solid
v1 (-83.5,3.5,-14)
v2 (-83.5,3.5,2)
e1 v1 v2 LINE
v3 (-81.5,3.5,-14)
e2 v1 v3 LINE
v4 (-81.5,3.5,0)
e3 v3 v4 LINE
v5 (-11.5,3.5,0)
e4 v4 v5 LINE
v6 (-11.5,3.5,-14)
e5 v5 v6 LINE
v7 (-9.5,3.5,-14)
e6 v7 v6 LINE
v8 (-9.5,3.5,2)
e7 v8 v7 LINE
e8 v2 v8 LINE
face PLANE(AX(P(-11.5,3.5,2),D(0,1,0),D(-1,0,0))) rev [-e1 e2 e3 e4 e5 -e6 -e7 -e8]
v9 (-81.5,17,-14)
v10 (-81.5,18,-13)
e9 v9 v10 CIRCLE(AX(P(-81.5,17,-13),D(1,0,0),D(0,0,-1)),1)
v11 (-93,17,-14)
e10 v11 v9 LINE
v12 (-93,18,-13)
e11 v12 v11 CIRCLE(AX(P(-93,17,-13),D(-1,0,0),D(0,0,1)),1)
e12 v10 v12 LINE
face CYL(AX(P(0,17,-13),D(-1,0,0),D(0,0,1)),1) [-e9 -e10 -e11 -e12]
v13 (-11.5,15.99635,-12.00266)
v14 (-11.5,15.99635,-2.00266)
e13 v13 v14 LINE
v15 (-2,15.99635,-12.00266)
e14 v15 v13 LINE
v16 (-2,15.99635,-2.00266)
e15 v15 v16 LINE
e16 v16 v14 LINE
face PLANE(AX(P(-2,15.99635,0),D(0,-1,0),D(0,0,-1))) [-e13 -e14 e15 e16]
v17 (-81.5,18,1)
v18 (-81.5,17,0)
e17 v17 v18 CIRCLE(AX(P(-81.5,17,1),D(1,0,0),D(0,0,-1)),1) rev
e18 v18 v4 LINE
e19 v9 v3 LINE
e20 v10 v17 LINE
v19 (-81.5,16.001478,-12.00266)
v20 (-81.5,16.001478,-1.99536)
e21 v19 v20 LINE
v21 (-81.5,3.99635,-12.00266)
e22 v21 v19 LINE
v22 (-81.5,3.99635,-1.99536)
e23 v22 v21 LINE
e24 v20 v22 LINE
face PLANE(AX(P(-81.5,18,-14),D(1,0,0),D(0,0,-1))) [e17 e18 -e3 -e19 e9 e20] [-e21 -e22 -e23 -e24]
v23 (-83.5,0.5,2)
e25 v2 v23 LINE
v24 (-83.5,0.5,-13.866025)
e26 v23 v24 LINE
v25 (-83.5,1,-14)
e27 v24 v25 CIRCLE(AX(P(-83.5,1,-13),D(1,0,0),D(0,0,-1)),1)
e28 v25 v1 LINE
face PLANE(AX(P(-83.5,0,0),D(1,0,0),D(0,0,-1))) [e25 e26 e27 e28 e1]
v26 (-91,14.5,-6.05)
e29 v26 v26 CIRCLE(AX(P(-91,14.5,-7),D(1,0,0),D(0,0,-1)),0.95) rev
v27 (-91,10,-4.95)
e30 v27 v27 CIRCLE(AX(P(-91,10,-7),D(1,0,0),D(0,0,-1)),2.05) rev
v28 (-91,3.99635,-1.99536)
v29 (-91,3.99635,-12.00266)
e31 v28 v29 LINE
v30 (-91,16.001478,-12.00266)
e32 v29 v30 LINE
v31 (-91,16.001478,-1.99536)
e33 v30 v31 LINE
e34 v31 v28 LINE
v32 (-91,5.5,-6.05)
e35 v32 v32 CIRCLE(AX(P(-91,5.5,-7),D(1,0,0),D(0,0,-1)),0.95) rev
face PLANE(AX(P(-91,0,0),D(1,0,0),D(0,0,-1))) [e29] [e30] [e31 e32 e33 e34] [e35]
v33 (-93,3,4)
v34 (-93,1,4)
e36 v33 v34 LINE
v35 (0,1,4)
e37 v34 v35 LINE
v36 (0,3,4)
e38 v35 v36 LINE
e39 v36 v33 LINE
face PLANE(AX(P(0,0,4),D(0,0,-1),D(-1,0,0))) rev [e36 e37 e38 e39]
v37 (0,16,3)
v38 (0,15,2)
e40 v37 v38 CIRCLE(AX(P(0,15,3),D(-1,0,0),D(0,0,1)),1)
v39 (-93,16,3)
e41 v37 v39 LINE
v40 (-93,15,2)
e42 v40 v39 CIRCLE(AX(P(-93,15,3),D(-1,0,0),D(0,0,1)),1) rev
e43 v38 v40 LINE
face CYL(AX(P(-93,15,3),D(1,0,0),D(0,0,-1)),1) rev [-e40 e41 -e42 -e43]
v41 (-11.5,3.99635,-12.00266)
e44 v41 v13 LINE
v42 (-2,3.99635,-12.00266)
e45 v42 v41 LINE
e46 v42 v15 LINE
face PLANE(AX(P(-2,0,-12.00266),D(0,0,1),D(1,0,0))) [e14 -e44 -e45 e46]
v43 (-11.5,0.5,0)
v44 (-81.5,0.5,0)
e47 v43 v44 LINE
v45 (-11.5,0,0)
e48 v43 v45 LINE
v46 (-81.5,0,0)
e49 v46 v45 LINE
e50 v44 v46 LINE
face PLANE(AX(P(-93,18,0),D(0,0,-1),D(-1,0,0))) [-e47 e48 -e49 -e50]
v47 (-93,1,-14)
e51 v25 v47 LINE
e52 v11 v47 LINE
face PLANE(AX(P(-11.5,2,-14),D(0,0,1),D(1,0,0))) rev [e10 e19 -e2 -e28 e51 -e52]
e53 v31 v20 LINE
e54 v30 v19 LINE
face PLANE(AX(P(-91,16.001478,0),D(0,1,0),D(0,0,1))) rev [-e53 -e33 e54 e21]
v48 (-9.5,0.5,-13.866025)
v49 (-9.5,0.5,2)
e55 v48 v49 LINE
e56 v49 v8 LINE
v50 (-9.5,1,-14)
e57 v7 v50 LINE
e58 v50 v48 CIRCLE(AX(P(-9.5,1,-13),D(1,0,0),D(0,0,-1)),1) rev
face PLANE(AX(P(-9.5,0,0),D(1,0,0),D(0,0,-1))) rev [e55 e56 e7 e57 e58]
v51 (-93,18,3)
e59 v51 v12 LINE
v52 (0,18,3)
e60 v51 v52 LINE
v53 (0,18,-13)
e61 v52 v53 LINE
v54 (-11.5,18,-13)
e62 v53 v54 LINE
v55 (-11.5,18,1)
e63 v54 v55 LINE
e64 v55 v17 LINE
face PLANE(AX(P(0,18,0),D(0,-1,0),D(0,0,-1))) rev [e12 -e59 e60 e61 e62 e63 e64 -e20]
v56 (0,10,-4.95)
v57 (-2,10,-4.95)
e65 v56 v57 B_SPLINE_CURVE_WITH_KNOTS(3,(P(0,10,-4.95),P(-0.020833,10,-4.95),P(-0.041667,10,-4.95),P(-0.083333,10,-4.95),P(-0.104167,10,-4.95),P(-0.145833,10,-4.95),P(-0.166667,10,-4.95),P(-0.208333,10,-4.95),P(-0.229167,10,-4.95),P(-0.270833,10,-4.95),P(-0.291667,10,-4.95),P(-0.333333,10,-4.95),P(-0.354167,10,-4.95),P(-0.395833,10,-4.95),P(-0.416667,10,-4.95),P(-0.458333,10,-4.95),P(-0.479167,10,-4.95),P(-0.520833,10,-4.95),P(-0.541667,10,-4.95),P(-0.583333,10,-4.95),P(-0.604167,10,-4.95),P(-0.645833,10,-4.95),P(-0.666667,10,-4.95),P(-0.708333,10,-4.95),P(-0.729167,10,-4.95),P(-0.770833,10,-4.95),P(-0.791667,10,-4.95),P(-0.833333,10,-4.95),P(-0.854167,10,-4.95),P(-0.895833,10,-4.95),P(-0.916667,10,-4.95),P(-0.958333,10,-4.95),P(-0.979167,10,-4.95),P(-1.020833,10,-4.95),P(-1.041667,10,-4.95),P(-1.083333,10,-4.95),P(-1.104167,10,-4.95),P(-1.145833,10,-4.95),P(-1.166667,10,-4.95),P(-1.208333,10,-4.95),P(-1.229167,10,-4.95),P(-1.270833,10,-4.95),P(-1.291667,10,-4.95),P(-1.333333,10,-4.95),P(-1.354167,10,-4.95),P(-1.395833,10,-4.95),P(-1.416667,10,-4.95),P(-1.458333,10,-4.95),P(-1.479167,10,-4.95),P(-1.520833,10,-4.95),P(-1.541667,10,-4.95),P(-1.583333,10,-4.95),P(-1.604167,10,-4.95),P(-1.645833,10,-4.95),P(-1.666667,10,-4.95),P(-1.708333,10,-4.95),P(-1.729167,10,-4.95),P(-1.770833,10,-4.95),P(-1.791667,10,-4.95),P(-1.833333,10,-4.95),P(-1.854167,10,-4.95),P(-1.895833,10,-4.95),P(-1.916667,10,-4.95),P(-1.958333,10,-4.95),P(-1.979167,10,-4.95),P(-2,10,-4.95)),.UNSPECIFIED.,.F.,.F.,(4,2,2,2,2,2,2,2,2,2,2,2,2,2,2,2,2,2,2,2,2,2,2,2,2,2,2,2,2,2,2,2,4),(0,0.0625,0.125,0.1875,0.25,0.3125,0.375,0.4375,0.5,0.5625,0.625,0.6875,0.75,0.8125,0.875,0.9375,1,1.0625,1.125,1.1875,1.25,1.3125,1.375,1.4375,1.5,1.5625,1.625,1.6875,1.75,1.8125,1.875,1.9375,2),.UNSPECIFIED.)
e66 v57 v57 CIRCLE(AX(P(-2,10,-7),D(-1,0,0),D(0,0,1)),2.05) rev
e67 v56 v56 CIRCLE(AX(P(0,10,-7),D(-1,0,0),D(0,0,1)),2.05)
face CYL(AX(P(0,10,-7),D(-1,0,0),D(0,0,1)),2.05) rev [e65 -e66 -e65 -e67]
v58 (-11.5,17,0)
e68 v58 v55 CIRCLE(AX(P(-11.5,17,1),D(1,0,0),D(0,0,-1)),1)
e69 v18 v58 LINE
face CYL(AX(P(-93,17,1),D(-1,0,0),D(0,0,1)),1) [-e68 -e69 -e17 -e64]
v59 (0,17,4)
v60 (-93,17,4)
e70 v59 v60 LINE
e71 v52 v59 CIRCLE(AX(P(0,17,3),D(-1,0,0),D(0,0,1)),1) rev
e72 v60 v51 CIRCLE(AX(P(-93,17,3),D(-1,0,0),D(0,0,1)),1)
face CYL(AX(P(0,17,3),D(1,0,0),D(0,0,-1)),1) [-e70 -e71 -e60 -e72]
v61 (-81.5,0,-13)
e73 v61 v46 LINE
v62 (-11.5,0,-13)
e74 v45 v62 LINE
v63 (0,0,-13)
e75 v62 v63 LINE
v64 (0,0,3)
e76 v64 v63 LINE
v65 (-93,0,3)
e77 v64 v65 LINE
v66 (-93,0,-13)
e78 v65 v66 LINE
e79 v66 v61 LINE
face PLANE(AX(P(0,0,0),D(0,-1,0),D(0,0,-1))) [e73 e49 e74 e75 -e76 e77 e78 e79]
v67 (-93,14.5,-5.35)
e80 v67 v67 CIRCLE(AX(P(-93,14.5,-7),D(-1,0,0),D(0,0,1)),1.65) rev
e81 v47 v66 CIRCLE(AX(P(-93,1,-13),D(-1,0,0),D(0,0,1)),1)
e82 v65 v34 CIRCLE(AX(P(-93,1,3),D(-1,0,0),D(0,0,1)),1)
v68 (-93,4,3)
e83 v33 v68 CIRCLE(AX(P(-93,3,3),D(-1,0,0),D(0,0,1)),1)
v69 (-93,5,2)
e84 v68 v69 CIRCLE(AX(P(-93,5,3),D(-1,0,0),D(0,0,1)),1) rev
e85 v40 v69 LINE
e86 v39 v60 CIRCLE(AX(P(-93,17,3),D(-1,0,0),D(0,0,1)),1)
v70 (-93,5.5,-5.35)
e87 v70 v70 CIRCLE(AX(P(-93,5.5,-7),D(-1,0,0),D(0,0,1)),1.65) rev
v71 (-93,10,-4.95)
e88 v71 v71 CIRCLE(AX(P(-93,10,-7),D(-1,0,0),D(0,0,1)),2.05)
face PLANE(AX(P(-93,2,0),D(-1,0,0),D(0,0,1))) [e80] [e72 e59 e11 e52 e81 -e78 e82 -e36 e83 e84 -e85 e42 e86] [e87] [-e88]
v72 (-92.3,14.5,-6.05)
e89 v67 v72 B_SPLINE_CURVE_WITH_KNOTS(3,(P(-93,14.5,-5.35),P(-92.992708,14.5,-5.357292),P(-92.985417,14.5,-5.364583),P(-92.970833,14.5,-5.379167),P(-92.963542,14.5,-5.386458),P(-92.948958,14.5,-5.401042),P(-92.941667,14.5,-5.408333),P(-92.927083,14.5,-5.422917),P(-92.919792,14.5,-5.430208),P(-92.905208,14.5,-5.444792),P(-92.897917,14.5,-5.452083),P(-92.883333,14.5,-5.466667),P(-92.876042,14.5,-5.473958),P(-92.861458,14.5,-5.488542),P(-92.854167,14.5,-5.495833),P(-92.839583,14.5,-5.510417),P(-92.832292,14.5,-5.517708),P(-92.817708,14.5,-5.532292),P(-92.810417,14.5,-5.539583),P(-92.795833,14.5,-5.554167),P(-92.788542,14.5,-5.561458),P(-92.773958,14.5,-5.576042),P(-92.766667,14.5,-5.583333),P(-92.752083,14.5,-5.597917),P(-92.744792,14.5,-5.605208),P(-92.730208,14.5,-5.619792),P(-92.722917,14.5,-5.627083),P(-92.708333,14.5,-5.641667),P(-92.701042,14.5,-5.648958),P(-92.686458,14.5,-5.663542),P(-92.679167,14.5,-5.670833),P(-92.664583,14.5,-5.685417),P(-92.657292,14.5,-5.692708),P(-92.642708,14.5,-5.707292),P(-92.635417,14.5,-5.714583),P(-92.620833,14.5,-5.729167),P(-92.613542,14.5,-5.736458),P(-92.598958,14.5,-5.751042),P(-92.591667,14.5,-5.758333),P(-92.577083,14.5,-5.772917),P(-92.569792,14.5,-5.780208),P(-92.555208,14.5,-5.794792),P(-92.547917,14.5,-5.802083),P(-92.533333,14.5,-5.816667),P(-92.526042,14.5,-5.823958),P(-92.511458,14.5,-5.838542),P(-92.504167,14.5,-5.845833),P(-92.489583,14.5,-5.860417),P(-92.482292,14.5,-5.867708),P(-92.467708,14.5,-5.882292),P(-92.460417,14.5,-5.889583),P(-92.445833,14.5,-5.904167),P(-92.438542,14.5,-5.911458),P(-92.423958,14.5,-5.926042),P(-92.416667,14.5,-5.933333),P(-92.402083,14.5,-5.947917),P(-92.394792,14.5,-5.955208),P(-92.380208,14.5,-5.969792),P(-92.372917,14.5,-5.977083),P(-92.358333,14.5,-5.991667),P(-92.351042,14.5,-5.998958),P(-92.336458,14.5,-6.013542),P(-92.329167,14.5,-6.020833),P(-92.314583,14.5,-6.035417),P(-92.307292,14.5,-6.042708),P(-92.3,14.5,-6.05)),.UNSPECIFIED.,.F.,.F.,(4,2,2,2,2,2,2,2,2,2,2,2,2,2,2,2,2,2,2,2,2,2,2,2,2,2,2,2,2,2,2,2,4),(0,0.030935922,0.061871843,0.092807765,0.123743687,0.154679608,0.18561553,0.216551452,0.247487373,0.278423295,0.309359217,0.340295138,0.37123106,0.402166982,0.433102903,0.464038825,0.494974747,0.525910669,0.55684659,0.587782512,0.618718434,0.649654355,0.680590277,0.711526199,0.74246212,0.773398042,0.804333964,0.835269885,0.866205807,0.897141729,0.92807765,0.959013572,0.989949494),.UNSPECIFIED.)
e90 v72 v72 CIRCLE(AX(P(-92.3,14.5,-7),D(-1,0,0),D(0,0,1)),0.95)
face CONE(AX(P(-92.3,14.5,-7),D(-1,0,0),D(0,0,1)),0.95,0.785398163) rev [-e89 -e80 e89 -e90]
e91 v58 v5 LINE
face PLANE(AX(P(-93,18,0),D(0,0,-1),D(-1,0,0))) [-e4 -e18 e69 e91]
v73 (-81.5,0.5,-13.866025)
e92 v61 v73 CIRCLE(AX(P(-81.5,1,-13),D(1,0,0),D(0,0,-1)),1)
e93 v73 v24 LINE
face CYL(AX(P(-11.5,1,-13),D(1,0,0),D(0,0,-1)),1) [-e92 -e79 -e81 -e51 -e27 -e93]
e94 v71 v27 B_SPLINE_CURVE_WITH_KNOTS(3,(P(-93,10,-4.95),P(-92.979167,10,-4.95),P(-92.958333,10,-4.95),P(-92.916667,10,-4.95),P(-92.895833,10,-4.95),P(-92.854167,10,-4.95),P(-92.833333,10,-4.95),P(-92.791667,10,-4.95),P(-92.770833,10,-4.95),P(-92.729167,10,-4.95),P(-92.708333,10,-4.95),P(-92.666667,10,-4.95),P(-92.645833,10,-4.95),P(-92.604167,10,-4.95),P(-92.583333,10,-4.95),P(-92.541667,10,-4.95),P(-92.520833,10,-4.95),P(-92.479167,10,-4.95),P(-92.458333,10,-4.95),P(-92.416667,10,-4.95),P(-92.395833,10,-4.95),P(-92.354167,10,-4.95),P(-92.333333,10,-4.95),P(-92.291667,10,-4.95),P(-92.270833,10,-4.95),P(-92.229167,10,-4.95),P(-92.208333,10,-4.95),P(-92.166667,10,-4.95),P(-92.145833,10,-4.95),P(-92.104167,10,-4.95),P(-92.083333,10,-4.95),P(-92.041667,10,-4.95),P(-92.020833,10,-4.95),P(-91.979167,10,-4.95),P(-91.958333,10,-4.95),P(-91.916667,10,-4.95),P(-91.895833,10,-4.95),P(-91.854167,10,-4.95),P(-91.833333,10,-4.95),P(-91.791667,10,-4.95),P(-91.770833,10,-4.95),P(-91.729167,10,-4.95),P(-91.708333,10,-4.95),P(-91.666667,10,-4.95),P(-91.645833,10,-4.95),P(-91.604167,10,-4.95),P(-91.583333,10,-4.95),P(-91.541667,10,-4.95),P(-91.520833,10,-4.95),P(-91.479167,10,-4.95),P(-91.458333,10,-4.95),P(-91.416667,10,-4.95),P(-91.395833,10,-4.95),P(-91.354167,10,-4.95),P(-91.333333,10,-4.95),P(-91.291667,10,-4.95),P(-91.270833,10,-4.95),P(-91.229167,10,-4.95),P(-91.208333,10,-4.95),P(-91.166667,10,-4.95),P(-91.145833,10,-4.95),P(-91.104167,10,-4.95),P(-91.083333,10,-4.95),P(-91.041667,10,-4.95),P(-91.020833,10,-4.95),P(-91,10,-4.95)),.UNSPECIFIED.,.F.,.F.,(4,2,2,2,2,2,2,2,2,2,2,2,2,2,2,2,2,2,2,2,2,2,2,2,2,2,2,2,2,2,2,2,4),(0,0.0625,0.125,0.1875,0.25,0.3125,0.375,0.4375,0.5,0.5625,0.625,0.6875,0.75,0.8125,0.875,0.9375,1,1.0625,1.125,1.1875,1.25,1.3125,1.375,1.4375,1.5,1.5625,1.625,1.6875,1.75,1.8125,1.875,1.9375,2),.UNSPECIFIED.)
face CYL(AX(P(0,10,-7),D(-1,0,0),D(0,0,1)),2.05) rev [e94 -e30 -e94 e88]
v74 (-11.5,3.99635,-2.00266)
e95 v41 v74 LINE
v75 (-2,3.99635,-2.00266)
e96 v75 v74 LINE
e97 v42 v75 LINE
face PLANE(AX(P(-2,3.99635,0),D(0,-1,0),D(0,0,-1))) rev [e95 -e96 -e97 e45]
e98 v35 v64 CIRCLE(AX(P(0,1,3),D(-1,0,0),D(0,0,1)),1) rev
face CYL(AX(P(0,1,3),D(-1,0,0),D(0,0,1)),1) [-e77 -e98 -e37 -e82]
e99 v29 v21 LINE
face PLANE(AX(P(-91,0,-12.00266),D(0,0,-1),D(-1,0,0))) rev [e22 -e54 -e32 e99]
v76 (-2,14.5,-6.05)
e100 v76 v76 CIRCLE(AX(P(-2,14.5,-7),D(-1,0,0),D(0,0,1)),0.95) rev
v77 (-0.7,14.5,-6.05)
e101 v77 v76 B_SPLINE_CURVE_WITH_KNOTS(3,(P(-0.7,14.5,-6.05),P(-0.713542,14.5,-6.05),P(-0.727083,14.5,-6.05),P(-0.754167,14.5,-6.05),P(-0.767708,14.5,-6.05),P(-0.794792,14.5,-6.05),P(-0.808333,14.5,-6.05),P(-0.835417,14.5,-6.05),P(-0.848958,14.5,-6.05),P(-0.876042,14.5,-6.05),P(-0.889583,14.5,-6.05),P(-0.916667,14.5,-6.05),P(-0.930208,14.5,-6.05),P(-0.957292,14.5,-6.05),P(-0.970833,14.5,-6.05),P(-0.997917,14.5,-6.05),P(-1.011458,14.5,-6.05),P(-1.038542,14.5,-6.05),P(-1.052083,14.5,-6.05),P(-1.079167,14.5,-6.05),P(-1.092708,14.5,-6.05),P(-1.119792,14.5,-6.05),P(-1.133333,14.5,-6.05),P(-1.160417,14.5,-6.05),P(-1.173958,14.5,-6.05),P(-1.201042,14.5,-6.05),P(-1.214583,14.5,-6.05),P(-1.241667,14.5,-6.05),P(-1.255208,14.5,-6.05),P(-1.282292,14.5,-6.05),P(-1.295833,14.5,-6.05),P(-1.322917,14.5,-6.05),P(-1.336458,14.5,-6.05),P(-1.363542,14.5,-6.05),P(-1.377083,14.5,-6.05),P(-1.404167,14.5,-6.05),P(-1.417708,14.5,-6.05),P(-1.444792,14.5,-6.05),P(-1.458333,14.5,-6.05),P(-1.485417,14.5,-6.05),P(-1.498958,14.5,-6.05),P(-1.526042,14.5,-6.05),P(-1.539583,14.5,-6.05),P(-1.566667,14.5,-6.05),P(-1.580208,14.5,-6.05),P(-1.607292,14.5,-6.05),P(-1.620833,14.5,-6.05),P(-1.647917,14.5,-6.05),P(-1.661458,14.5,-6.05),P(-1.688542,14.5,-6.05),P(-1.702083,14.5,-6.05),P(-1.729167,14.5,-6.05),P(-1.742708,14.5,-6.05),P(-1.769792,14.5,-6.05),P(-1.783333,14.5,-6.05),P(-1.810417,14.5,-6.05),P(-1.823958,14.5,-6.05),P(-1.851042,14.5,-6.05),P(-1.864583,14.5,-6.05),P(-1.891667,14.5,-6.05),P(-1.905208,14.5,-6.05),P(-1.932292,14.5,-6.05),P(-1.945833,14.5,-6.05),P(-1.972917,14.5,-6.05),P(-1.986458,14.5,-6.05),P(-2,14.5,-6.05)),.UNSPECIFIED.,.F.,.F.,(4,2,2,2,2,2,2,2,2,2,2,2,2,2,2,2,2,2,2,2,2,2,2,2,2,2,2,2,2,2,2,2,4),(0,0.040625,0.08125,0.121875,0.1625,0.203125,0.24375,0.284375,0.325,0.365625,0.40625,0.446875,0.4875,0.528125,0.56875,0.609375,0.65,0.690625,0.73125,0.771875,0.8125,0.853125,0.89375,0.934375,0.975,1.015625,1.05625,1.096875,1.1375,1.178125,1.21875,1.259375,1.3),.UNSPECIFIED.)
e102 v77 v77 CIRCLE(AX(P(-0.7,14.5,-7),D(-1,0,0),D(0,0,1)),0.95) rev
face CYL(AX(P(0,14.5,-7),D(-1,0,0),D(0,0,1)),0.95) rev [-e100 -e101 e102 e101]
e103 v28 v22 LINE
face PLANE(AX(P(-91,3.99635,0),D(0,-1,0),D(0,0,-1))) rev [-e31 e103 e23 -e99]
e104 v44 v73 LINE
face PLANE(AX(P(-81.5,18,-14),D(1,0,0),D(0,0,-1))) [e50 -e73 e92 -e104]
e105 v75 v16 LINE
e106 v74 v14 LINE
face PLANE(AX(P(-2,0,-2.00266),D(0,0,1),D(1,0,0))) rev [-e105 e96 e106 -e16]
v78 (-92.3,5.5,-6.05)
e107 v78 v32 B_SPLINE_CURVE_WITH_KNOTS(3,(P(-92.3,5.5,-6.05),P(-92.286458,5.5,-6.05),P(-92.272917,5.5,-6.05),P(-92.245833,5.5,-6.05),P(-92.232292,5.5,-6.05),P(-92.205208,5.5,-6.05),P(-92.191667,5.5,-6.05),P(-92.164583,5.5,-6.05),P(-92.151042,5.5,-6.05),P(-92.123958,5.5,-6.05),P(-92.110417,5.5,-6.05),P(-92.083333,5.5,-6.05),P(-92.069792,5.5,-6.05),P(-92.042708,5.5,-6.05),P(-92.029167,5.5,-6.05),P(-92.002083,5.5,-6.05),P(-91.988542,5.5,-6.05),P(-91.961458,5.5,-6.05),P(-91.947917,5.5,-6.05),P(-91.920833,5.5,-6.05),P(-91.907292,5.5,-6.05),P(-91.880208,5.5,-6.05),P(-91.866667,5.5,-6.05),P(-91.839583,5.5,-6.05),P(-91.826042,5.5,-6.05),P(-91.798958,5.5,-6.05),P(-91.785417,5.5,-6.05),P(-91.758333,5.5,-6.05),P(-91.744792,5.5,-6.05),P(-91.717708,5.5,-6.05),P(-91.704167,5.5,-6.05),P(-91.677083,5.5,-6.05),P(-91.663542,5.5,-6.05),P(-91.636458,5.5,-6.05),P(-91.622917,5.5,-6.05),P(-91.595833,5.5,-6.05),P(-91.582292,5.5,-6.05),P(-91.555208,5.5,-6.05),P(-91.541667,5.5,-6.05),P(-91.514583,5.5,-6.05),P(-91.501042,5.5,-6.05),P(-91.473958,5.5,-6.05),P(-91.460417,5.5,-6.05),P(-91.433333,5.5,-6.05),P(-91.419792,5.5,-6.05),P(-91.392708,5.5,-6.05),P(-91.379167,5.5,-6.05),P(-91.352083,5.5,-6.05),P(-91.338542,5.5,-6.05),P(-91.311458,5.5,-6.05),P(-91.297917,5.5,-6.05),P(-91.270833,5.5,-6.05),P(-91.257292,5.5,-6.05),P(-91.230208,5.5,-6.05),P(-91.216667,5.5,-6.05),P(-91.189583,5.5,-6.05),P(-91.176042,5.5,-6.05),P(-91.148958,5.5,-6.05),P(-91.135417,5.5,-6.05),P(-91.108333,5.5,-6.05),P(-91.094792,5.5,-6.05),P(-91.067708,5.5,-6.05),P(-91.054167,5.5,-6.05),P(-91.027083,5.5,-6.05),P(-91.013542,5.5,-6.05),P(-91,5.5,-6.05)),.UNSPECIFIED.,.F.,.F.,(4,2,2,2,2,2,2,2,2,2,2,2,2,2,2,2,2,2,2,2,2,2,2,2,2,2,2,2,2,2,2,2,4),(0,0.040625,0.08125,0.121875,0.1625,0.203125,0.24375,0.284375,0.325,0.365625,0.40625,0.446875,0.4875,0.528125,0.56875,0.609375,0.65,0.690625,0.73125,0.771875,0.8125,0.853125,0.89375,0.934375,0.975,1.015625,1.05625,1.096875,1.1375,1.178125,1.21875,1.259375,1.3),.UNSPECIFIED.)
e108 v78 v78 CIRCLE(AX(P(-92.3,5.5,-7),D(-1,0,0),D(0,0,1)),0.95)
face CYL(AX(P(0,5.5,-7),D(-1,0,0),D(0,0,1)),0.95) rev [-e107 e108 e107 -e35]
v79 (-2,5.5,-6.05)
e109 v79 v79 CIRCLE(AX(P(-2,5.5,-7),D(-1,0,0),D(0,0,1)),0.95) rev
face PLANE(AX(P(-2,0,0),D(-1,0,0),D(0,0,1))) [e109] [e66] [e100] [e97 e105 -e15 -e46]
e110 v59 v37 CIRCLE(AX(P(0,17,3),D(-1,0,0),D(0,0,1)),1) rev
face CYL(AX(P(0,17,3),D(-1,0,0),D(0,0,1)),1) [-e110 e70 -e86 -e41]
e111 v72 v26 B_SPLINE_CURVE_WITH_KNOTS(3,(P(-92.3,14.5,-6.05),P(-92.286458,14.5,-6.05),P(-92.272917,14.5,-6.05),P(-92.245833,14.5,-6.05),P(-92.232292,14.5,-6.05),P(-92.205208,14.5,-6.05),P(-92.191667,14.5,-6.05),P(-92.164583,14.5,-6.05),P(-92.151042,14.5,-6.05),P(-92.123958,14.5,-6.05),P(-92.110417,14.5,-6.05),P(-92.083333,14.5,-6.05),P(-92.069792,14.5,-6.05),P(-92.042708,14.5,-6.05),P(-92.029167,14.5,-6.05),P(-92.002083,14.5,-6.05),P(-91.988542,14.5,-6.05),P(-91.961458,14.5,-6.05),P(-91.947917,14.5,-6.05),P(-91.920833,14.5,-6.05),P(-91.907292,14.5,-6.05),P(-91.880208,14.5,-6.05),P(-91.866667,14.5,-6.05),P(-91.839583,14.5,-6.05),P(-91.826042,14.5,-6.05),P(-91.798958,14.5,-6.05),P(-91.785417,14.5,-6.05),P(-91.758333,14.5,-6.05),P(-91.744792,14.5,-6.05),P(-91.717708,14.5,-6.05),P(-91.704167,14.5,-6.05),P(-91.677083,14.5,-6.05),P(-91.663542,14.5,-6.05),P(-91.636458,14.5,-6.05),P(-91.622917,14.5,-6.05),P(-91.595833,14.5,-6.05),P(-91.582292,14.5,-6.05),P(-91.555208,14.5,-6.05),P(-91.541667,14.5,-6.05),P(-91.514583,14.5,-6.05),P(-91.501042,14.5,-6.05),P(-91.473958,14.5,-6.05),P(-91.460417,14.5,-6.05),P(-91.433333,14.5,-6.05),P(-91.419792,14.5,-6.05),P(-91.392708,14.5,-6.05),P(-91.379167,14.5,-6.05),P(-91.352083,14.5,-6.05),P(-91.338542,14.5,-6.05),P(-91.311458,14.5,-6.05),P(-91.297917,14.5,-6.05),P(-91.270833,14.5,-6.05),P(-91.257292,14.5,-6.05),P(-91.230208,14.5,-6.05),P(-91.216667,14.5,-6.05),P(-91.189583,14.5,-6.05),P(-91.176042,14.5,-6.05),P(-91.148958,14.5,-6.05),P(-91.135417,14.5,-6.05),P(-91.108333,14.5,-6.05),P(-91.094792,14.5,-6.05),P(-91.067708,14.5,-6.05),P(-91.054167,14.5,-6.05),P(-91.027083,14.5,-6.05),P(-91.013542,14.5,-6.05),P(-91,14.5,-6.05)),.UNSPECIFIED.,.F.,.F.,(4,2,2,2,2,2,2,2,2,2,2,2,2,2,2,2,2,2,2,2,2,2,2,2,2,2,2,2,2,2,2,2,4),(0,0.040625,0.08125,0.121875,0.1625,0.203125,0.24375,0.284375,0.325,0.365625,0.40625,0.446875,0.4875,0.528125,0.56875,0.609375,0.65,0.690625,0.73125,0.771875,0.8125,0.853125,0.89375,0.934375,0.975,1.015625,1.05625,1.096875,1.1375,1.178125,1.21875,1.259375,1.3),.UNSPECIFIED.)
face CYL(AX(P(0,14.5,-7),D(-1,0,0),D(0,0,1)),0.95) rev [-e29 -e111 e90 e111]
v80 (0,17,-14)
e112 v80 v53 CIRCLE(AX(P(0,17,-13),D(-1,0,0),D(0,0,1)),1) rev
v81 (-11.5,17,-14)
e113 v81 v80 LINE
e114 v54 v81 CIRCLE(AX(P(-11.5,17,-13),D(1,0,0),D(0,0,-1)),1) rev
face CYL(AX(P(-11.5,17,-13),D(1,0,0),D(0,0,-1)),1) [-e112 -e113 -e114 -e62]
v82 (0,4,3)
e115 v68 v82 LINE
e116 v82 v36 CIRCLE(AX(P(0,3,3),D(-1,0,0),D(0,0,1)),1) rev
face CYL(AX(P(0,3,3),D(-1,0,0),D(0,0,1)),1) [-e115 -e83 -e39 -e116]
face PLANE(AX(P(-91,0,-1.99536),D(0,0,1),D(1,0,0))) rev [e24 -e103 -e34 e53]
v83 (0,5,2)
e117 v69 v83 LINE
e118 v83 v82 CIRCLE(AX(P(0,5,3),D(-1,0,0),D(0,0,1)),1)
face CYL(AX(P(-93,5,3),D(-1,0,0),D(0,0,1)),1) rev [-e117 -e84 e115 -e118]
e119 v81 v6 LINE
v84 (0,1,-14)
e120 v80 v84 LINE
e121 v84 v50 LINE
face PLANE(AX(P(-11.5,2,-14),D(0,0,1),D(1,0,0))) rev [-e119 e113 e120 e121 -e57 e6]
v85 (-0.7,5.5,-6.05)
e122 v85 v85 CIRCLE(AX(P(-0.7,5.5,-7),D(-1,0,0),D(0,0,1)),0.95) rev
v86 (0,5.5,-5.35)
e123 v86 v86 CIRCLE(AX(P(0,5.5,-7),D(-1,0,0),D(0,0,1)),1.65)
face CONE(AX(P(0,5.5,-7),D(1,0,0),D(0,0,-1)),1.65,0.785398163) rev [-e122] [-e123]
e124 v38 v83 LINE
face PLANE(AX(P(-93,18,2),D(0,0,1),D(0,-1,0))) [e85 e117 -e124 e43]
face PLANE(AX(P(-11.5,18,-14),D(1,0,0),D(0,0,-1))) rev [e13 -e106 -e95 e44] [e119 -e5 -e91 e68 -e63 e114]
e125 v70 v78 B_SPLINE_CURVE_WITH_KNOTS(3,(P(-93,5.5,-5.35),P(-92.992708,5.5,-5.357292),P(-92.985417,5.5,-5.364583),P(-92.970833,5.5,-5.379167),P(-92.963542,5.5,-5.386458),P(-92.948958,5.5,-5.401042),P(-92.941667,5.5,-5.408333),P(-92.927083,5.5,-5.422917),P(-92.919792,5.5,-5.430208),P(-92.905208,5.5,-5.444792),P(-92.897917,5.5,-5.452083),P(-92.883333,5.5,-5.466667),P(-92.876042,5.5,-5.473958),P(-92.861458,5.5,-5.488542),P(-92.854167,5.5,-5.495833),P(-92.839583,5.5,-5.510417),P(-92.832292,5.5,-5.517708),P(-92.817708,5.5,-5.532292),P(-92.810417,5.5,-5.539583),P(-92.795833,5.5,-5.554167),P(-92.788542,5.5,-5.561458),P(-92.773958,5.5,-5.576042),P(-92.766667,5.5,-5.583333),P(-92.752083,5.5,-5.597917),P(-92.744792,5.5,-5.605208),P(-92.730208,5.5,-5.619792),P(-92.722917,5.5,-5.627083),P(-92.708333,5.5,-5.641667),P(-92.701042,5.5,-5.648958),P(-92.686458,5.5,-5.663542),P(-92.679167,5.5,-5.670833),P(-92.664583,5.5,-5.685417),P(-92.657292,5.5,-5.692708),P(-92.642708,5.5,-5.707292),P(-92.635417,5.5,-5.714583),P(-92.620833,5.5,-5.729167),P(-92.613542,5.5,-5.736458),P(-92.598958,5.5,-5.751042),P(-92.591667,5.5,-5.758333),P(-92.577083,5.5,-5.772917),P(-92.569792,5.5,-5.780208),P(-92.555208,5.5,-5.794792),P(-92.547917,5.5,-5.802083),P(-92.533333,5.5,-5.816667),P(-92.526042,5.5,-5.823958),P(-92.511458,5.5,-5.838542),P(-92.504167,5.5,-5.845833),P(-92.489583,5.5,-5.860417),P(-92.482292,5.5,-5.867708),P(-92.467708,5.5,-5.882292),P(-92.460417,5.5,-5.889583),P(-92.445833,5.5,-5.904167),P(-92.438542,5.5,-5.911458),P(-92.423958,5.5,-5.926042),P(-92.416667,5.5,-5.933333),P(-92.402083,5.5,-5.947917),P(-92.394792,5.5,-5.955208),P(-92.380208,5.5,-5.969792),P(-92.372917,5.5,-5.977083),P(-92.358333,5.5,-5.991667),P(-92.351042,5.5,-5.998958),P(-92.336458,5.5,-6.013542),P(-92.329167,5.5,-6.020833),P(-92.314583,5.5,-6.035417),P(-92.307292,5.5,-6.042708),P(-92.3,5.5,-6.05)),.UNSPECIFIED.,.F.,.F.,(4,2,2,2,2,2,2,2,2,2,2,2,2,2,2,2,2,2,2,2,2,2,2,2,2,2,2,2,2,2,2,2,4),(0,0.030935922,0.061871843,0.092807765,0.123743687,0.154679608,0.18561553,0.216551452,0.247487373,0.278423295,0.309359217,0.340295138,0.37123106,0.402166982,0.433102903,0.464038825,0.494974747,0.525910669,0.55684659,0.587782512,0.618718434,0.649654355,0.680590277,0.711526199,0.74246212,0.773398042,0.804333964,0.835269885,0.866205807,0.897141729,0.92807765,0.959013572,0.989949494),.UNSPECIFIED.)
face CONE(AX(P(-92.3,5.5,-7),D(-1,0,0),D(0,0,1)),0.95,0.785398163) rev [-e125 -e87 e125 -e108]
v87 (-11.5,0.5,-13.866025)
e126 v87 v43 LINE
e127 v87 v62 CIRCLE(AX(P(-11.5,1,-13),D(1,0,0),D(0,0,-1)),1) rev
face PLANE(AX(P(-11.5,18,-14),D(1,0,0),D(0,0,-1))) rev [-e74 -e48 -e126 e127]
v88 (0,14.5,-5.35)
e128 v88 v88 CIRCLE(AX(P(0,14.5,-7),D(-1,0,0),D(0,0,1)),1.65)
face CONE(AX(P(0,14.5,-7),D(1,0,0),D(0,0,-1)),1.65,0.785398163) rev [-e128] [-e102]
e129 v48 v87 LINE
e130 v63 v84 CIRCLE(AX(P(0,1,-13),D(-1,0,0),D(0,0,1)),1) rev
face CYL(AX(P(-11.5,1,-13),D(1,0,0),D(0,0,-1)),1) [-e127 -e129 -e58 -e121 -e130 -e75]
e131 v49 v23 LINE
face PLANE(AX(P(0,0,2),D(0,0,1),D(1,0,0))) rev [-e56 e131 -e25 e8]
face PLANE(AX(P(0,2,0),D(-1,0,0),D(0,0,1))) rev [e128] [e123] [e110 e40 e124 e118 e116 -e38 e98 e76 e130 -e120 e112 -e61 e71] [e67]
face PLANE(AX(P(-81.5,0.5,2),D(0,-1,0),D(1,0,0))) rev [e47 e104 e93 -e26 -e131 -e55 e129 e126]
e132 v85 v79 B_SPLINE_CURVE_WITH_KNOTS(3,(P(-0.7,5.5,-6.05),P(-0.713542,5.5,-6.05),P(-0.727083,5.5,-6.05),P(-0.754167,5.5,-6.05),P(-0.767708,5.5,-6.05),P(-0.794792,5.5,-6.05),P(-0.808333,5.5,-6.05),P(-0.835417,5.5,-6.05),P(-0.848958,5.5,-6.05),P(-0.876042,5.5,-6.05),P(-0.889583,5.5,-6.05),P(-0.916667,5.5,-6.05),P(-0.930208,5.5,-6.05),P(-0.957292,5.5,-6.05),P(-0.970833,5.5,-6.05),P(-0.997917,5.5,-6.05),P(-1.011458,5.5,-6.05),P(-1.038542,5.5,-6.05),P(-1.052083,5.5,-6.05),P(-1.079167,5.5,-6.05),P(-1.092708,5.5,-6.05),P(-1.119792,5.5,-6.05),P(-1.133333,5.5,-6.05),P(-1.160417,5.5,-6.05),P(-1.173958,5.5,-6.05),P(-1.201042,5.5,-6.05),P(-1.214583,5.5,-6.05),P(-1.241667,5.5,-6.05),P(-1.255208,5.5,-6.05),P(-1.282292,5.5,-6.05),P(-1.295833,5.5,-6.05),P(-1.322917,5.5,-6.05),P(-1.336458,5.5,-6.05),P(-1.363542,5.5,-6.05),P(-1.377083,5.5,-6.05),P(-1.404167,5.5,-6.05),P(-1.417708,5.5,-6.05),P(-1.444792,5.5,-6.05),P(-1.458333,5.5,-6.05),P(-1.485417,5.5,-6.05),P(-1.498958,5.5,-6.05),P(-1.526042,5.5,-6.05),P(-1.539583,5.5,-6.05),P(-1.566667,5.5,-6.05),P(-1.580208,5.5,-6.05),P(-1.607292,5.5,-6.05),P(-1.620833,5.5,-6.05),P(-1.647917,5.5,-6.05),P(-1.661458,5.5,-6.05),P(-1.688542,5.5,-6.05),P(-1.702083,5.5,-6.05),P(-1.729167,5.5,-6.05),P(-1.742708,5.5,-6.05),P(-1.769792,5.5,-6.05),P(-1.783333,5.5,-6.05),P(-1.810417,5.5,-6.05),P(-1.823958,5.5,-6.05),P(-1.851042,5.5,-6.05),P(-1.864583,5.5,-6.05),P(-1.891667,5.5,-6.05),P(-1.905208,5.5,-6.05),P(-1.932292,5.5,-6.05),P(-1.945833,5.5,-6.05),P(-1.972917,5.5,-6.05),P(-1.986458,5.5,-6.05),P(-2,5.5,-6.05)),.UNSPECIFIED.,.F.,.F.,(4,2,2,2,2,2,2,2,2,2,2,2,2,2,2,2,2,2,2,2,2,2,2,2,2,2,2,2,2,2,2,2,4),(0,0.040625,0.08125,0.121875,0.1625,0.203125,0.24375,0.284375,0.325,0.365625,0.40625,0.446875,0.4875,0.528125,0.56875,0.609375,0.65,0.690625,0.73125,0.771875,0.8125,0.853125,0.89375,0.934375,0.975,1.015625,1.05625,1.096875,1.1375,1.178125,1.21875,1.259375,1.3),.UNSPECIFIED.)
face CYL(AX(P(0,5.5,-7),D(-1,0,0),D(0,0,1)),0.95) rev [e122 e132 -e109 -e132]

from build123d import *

# Parameters (mm, degrees)
BOSS_EXTRUDE1_DEPTH = 2
SKETCH2_5_W         = 11.5
SKETCH2_5_H         = 14
BOSS_EXTRUDE3_DEPTH = 18
SKETCH3_R           = 2.05
SKETCH3_R_2         = 0.95
CUT_EXTRUDE2_DEPTH  = 96.754895436
CUT_EXTRUDE3_START  = -9.5
SKETCH5_W           = 10.007299984
SKETCH5_H           = 12.005127567
SKETCH5_R           = 0.95
SKETCH5_R_2         = 2.05
CUT_EXTRUDE3_DEPTH  = 9.5
SKETCH6_W           = 10
SKETCH6_H           = 12
SKETCH6_R           = 0.95
SKETCH6_R_2         = 2.05
CUT_EXTRUDE4_DEPTH  = 9.5
CHAMFER1_SIZE       = 0.7
SKETCH11_W          = 2
SKETCH11_H          = 18
BOSS_EXTRUDE6_DEPTH = 93
SKETCH12_W          = 93
SKETCH12_H          = 4
SKETCH12_H_2        = 2
BOSS_EXTRUDE7_DEPTH = 2
SKETCH14_W          = 70
SKETCH14_H          = 14
CUT_EXTRUDE6_DEPTH  = 2
SKETCH16_W          = 70
SKETCH16_H          = 3
CUT_EXTRUDE7_DEPTH  = 2
SKETCH17_W          = 16
SKETCH17_H          = 3
CUT_EXTRUDE8_DEPTH  = 2
SKETCH18_W          = 16
SKETCH18_H          = 3
CUT_EXTRUDE9_DEPTH  = 2
FILLET4_R           = 1


with BuildPart() as part:
    # Sketch2 → Boss-Extrude1 (new body)
    with BuildSketch(Plane(origin=(0, 0, 0), x_dir=(1, 0, 0), z_dir=(0, 1, 0))):
        Polygon((-11.5, 0), (-81.5, 0), (-93, 0), (-93, 14), (-81.5, 14), (-11.5, 14), (0, 14), (0, 0), align=None)
    extrude(amount=BOSS_EXTRUDE1_DEPTH)

    # Sketch2<5> → Boss-Extrude3 (add)
    with BuildSketch(Plane(origin=(0, 0, 0), x_dir=(1, 0, 0), z_dir=(0, 1, 0))):
        with Locations((-87.25, 7)):
            Rectangle(SKETCH2_5_W, SKETCH2_5_H)
        with Locations((-5.75, 7)):
            Rectangle(SKETCH2_5_W, SKETCH2_5_H)
    extrude(amount=BOSS_EXTRUDE3_DEPTH)

    # Sketch3 → Cut-Extrude2 (cut, through all)
    with BuildSketch(Plane.ZY.offset(93)):
        with Locations((-7, 10)):
            Circle(SKETCH3_R)
        with Locations((-7, 14.5)):
            Circle(SKETCH3_R_2)
        with Locations((-7, 5.5)):
            Circle(SKETCH3_R_2)
    extrude(amount=-CUT_EXTRUDE2_DEPTH, mode=Mode.SUBTRACT)

    # Sketch5 → Cut-Extrude3 (cut)
    with BuildSketch(Plane(origin=(-81.5, 0, 0), x_dir=(0, 0, -1), z_dir=(1, 0, 0)).offset(CUT_EXTRUDE3_START)):
        with Locations((6.99901027, 9.998913792)):
            Rectangle(SKETCH5_W, SKETCH5_H)
        with Locations(Location((7, 14.5, 0), (0, 0, 180))):
            Circle(SKETCH5_R, mode=Mode.SUBTRACT)
        with Locations(Location((7, 5.5, 0), (0, 0, 180))):
            Circle(SKETCH5_R, mode=Mode.SUBTRACT)
        with Locations(Location((7, 10, 0), (0, 0, 180))):
            Circle(SKETCH5_R_2, mode=Mode.SUBTRACT)
    extrude(amount=CUT_EXTRUDE3_DEPTH, mode=Mode.SUBTRACT)

    # Sketch6 → Cut-Extrude4 (cut)
    with BuildSketch(Plane.ZY.offset(11.5)):
        with Locations((-7.002660262, 9.996350008)):
            Rectangle(SKETCH6_W, SKETCH6_H)
        with Locations((-7, 14.5)):
            Circle(SKETCH6_R, mode=Mode.SUBTRACT)
        with Locations((-7, 5.5)):
            Circle(SKETCH6_R, mode=Mode.SUBTRACT)
        with Locations((-7, 10)):
            Circle(SKETCH6_R_2, mode=Mode.SUBTRACT)
    extrude(amount=-CUT_EXTRUDE4_DEPTH, mode=Mode.SUBTRACT)

    # Chamfer1
    chamfer1_edges = [part.edges().sort_by_distance(p)[0] for p in [
        (0, 14.5, -7.95),
        (-93, 14.5, -7.95),
        (0, 5.5, -7.95),
        (-93, 5.5, -7.95),
    ]]
    chamfer(chamfer1_edges, length=CHAMFER1_SIZE)

    # Sketch11 → Boss-Extrude6 (add)
    with BuildSketch(Plane(origin=(0, 0, 0), x_dir=(0, 0, -1), z_dir=(1, 0, 0))):
        with Locations((-1, 9)):
            Rectangle(SKETCH11_W, SKETCH11_H)
    extrude(amount=-BOSS_EXTRUDE6_DEPTH)

    # Sketch12 → Boss-Extrude7 (add)
    with BuildSketch(Plane.XY.offset(2)):
        with Locations((-46.5, 2)):
            Rectangle(SKETCH12_W, SKETCH12_H)
        with Locations((-46.5, 17)):
            Rectangle(SKETCH12_W, SKETCH12_H_2)
    extrude(amount=BOSS_EXTRUDE7_DEPTH)

    # Sketch14 → Cut-Extrude6 (cut)
    with BuildSketch(Plane(origin=(0, 2, 0), x_dir=(1, 0, 0), z_dir=(0, 1, 0))):
        with Locations((-46.5, 7)):
            Rectangle(SKETCH14_W, SKETCH14_H)
    extrude(amount=-CUT_EXTRUDE6_DEPTH, mode=Mode.SUBTRACT)

    # Sketch16 → Cut-Extrude7 (cut)
    with BuildSketch(Plane(origin=(0, 0, 0), x_dir=(-1, 0, 0), z_dir=(0, 0, -1))):
        with Locations((46.5, 2)):
            Rectangle(SKETCH16_W, SKETCH16_H)
    extrude(amount=-CUT_EXTRUDE7_DEPTH, mode=Mode.SUBTRACT)

    # Sketch17 → Cut-Extrude8 (cut)
    with BuildSketch(Plane(origin=(-81.5, 0, 0), x_dir=(0, 0, -1), z_dir=(1, 0, 0))):
        with Locations((6, 2)):
            Rectangle(SKETCH17_W, SKETCH17_H)
    extrude(amount=-CUT_EXTRUDE8_DEPTH, mode=Mode.SUBTRACT)

    # Sketch18 → Cut-Extrude9 (cut)
    with BuildSketch(Plane.ZY.offset(11.5)):
        with Locations((-6, 2)):
            Rectangle(SKETCH18_W, SKETCH18_H)
    extrude(amount=-CUT_EXTRUDE9_DEPTH, mode=Mode.SUBTRACT)

    # Fillet4
    fillet4_edges = [part.edges().sort_by_distance(p)[0] for p in [
        (-46.5, 18, 0),
        (-46.5, 4, 2),
        (-46.5, 0, 4),
        (-46.5, 4, 4),
        (-46.5, 16, 2),
        (-46.5, 18, 4),
        (-87.25, 0, -14),
        (-87.25, 18, -14),
        (-5.75, 18, -14),
        (-5.75, 0, -14),
        (-46.5, 16, 4),
    ]]
    fillet(fillet4_edges, radius=FILLET4_R - 0.0001)  # a hair under: the kernel refuses the full size


solid = part.part
